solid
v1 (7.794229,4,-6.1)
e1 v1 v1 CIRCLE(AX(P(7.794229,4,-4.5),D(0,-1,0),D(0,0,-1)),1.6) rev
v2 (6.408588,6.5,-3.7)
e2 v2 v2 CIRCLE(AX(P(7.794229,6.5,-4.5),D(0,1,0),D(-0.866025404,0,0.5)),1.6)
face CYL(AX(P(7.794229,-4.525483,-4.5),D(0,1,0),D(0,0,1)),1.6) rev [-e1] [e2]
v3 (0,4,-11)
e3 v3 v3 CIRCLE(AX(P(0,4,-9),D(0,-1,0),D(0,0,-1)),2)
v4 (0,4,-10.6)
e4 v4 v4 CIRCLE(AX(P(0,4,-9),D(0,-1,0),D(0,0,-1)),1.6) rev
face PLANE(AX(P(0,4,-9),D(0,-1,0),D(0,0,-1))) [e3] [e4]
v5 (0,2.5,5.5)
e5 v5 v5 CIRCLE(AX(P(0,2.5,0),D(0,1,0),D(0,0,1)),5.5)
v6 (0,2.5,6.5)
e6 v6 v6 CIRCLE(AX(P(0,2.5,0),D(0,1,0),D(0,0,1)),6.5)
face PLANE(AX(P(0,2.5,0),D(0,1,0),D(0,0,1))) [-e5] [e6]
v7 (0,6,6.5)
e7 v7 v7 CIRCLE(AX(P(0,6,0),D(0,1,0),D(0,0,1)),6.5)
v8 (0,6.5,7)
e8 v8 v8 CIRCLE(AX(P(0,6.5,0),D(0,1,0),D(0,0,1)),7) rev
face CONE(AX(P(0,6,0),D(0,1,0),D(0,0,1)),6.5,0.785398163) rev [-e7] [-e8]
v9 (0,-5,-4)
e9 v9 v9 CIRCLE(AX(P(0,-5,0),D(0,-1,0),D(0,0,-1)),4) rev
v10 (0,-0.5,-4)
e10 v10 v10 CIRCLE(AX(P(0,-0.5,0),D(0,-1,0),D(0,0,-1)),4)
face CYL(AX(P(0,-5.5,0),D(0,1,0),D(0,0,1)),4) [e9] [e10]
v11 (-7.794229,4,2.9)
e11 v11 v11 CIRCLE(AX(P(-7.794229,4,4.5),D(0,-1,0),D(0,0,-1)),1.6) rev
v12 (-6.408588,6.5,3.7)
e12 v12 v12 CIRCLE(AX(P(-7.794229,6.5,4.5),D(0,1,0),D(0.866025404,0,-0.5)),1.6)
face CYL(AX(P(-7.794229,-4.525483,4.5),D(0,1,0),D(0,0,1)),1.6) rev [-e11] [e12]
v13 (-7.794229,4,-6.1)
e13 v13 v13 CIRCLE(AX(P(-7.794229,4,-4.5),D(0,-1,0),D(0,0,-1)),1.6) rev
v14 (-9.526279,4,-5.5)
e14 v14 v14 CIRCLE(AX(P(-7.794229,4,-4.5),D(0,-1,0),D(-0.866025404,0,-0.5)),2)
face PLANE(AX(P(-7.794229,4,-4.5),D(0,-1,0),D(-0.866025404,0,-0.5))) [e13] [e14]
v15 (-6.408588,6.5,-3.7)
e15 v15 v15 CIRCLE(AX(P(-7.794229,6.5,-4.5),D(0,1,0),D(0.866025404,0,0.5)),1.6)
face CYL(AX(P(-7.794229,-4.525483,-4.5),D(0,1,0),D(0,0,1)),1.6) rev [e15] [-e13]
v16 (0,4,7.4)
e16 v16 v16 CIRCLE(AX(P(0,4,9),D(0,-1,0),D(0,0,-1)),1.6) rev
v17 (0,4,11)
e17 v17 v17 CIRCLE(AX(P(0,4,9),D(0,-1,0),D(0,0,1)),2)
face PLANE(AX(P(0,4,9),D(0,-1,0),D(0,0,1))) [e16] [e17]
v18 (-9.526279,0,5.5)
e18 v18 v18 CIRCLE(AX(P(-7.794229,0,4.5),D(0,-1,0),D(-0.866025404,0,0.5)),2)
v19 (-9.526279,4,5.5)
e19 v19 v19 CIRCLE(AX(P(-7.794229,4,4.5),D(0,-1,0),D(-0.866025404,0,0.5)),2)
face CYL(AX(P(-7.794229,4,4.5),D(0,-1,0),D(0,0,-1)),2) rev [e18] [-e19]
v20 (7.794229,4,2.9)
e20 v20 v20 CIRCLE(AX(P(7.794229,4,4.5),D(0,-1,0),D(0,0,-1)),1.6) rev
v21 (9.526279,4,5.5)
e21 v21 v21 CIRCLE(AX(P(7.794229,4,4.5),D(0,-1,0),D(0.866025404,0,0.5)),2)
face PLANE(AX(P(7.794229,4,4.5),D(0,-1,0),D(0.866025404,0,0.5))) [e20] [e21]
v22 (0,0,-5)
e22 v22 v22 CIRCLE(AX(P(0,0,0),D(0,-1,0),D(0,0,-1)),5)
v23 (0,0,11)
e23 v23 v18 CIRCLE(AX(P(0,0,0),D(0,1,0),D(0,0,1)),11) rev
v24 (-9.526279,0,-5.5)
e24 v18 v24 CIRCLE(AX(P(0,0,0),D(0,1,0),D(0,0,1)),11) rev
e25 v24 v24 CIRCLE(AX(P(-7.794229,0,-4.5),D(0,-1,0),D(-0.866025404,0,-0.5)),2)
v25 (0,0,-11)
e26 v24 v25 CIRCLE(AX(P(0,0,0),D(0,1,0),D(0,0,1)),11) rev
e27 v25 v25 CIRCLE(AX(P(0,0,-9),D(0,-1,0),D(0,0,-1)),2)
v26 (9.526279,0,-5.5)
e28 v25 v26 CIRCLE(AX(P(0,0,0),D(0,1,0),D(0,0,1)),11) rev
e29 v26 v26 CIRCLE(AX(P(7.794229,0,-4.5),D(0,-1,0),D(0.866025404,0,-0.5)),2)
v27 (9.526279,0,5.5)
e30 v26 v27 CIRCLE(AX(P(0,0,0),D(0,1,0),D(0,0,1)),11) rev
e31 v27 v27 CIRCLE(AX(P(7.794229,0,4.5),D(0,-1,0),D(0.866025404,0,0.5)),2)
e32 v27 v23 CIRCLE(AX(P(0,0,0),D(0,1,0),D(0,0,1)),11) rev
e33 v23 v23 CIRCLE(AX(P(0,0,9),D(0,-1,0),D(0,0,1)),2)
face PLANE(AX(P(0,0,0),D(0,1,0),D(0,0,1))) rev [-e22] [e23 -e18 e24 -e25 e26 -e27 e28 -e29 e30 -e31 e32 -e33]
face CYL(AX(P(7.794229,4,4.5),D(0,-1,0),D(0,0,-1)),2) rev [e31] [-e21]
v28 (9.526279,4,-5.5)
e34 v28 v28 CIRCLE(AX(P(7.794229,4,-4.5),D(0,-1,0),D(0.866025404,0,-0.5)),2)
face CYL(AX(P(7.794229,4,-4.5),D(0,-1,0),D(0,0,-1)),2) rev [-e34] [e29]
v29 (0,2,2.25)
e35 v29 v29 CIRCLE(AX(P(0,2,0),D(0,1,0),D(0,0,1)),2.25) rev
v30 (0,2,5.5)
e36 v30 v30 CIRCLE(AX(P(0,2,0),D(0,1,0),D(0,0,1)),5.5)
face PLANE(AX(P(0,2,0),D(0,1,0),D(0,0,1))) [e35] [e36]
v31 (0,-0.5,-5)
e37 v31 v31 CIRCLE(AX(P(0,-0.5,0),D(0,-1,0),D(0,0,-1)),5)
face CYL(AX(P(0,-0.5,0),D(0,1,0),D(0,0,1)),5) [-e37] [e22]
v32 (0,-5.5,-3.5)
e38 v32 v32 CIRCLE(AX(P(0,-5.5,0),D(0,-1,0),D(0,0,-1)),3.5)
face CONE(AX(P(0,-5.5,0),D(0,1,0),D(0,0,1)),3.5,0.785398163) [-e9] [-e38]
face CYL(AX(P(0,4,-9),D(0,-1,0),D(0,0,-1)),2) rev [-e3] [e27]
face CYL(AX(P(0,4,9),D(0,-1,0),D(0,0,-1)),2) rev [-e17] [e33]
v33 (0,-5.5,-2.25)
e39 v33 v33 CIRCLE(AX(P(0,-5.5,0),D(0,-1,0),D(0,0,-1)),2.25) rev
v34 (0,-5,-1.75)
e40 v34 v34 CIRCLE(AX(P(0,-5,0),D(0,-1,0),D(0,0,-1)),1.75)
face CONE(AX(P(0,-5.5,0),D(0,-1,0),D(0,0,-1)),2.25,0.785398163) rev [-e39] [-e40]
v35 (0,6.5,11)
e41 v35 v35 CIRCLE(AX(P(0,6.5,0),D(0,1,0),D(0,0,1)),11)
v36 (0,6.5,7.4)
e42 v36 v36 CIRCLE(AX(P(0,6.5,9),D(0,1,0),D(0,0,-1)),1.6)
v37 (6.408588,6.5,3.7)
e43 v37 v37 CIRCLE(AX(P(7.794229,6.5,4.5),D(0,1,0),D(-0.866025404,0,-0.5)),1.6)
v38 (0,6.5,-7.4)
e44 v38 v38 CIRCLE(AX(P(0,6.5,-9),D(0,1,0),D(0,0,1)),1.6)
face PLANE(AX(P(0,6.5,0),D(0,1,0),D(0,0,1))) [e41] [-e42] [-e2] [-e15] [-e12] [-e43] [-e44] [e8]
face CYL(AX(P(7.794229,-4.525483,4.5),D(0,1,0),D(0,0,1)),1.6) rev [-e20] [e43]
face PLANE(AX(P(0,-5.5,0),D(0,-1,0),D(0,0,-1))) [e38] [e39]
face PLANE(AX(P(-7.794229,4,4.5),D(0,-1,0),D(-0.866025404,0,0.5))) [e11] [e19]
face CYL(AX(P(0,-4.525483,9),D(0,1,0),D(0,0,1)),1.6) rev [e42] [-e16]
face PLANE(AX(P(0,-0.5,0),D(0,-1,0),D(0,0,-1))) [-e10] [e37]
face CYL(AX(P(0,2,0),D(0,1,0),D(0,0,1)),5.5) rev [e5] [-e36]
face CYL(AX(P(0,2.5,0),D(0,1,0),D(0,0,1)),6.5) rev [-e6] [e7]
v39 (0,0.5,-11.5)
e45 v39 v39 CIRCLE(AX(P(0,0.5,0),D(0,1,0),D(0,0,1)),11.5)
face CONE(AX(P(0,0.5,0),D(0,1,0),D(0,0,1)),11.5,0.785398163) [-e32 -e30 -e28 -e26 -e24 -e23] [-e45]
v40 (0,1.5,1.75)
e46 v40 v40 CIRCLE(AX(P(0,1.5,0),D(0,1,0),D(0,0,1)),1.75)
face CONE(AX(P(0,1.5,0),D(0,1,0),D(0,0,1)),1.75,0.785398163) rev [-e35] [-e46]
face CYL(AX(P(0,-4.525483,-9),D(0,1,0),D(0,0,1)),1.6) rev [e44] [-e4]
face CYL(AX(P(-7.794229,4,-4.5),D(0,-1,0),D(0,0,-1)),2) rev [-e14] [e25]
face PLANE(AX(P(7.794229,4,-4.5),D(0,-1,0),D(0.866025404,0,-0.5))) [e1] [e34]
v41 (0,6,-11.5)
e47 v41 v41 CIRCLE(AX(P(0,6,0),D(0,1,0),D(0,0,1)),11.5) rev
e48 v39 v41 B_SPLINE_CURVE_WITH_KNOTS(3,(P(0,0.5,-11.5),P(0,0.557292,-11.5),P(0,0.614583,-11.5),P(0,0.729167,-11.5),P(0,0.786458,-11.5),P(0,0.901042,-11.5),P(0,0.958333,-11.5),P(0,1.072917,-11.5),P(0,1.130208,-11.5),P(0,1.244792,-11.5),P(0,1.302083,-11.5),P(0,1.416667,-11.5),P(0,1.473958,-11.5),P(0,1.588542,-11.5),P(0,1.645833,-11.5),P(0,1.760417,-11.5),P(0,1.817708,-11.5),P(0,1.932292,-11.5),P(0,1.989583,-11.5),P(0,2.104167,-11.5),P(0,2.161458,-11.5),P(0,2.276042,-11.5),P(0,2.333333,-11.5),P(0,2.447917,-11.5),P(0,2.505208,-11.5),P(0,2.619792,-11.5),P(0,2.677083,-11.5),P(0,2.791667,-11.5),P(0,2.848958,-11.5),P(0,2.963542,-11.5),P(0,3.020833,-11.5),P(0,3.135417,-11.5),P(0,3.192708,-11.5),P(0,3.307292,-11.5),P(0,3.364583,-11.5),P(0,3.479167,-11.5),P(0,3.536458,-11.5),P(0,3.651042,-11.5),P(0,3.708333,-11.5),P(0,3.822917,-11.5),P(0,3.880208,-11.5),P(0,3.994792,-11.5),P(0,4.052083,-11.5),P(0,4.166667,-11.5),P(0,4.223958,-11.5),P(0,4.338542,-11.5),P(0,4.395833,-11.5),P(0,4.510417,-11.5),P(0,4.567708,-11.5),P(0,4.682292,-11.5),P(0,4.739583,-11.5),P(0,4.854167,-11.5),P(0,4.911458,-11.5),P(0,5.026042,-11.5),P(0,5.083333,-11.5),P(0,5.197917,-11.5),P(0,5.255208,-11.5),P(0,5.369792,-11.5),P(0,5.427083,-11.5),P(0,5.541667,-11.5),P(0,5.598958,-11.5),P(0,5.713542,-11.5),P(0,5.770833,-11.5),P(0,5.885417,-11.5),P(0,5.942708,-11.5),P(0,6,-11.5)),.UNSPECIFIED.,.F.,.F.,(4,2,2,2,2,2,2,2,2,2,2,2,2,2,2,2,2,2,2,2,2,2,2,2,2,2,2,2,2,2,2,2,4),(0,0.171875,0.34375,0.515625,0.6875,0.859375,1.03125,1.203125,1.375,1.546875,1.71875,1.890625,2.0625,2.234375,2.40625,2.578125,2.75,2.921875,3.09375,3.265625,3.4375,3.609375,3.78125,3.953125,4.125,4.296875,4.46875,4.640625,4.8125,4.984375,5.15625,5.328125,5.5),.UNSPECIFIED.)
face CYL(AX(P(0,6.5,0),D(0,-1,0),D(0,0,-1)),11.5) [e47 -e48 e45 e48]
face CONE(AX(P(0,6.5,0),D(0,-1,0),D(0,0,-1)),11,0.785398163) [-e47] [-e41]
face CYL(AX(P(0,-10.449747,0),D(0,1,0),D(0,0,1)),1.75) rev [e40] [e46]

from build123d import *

# Parameters (mm, degrees)
SKETCH1_R           = 11.5
BOSS_EXTRUDE1_DEPTH = 6.5
SKETCH2_R           = 5
BOSS_EXTRUDE2_DEPTH = 0.5
SKETCH3_R           = 4
BOSS_EXTRUDE3_DEPTH = 5
SKETCH4_R           = 6.5
CUT_EXTRUDE1_DEPTH  = 4
SKETCH5_R           = 5.5
CUT_EXTRUDE2_DEPTH  = 0.5
SKETCH6_R           = 1.75
CUT_EXTRUDE3_DEPTH  = 7.5
SKETCH7_R           = 1.6
CUT_EXTRUDE4_DEPTH  = 6.5
SKETCH8_R           = 2
CUT_EXTRUDE5_DEPTH  = 4
CIRPATTERN1_COUNT   = 6
CHAMFER2_SIZE       = 0.5


with BuildPart() as part:
    # Sketch1 → Boss-Extrude1 (new body)
    with BuildSketch(Plane(origin=(0, 0, 0), x_dir=(1, 0, 0), z_dir=(0, 1, 0))):
        with Locations(Location((0, 0, 0), (0, 0, 90))):
            Circle(SKETCH1_R)
    extrude(amount=BOSS_EXTRUDE1_DEPTH)

    # Sketch2 → Boss-Extrude2 (add)
    with BuildSketch(Plane.XZ):
        with Locations(Location((0, 0, 0), (0, 0, 270))):
            Circle(SKETCH2_R)
    extrude(amount=BOSS_EXTRUDE2_DEPTH)

    # Sketch3 → Boss-Extrude3 (add)
    with BuildSketch(Plane.XZ.offset(0.5)):
        with Locations(Location((0, 0, 0), (0, 0, 270))):
            Circle(SKETCH3_R)
    extrude(amount=BOSS_EXTRUDE3_DEPTH)

    # Sketch4 → Cut-Extrude1 (cut)
    with BuildSketch(Plane(origin=(0, 6.5, 0), x_dir=(1, 0, 0), z_dir=(0, 1, 0))):
        with Locations(Location((0, 0, 0), (0, 0, 270))):
            Circle(SKETCH4_R)
    extrude(amount=-CUT_EXTRUDE1_DEPTH, mode=Mode.SUBTRACT)

    # Sketch5 → Cut-Extrude2 (cut)
    with BuildSketch(Plane(origin=(0, 2.5, 0), x_dir=(1, 0, 0), z_dir=(0, 1, 0))):
        with Locations(Location((0, 0, 0), (0, 0, 270))):
            Circle(SKETCH5_R)
    extrude(amount=-CUT_EXTRUDE2_DEPTH, mode=Mode.SUBTRACT)

    # Sketch6 → Cut-Extrude3 (cut)
    with BuildSketch(Plane(origin=(0, 2, 0), x_dir=(1, 0, 0), z_dir=(0, 1, 0))):
        with Locations(Location((0, 0, 0), (0, 0, 270))):
            Circle(SKETCH6_R)
    extrude(amount=-CUT_EXTRUDE3_DEPTH, mode=Mode.SUBTRACT)

    # Sketch7 → Cut-Extrude4 (cut)
    with BuildSketch(Plane(origin=(0, 6.5, 0), x_dir=(1, 0, 0), z_dir=(0, 1, 0))):
        with Locations(Location((0, 9, 0), (0, 0, 270))):
            Circle(SKETCH7_R)
    cut_extrude4 = extrude(amount=-CUT_EXTRUDE4_DEPTH, mode=Mode.SUBTRACT)

    # Sketch8 → Cut-Extrude5 (cut)
    with BuildSketch(Plane.XZ):
        with Locations(Location((0, -9, 0), (0, 0, 270))):
            Circle(SKETCH8_R)
    cut_extrude5 = extrude(amount=-CUT_EXTRUDE5_DEPTH, mode=Mode.SUBTRACT)

    # CirPattern1: Cut-Extrude4, Cut-Extrude5 ×6 about axis
    cirpattern1_axis = Axis((0, 0, 0), (0, 1, 0))
    add([cut_extrude4.rotate(cirpattern1_axis, i * 360 / CIRPATTERN1_COUNT) for i in range(1, CIRPATTERN1_COUNT)], mode=Mode.SUBTRACT)
    add([cut_extrude5.rotate(cirpattern1_axis, i * 360 / CIRPATTERN1_COUNT) for i in range(1, CIRPATTERN1_COUNT)], mode=Mode.SUBTRACT)

    # Chamfer2
    chamfer2_edges = [part.edges().sort_by_distance(p)[0] for p in [
        (0, -5.5, 4),
        (0, 6.5, -6.5),
        (0, 0, 11.5),
        (0, 2, -1.75),
        (0, -5.5, -1.75),
        (0, 6.5, 11.5),
    ]]
    chamfer(chamfer2_edges, length=CHAMFER2_SIZE - 0.0001)  # a hair under: the kernel refuses the full size


solid = part.part
